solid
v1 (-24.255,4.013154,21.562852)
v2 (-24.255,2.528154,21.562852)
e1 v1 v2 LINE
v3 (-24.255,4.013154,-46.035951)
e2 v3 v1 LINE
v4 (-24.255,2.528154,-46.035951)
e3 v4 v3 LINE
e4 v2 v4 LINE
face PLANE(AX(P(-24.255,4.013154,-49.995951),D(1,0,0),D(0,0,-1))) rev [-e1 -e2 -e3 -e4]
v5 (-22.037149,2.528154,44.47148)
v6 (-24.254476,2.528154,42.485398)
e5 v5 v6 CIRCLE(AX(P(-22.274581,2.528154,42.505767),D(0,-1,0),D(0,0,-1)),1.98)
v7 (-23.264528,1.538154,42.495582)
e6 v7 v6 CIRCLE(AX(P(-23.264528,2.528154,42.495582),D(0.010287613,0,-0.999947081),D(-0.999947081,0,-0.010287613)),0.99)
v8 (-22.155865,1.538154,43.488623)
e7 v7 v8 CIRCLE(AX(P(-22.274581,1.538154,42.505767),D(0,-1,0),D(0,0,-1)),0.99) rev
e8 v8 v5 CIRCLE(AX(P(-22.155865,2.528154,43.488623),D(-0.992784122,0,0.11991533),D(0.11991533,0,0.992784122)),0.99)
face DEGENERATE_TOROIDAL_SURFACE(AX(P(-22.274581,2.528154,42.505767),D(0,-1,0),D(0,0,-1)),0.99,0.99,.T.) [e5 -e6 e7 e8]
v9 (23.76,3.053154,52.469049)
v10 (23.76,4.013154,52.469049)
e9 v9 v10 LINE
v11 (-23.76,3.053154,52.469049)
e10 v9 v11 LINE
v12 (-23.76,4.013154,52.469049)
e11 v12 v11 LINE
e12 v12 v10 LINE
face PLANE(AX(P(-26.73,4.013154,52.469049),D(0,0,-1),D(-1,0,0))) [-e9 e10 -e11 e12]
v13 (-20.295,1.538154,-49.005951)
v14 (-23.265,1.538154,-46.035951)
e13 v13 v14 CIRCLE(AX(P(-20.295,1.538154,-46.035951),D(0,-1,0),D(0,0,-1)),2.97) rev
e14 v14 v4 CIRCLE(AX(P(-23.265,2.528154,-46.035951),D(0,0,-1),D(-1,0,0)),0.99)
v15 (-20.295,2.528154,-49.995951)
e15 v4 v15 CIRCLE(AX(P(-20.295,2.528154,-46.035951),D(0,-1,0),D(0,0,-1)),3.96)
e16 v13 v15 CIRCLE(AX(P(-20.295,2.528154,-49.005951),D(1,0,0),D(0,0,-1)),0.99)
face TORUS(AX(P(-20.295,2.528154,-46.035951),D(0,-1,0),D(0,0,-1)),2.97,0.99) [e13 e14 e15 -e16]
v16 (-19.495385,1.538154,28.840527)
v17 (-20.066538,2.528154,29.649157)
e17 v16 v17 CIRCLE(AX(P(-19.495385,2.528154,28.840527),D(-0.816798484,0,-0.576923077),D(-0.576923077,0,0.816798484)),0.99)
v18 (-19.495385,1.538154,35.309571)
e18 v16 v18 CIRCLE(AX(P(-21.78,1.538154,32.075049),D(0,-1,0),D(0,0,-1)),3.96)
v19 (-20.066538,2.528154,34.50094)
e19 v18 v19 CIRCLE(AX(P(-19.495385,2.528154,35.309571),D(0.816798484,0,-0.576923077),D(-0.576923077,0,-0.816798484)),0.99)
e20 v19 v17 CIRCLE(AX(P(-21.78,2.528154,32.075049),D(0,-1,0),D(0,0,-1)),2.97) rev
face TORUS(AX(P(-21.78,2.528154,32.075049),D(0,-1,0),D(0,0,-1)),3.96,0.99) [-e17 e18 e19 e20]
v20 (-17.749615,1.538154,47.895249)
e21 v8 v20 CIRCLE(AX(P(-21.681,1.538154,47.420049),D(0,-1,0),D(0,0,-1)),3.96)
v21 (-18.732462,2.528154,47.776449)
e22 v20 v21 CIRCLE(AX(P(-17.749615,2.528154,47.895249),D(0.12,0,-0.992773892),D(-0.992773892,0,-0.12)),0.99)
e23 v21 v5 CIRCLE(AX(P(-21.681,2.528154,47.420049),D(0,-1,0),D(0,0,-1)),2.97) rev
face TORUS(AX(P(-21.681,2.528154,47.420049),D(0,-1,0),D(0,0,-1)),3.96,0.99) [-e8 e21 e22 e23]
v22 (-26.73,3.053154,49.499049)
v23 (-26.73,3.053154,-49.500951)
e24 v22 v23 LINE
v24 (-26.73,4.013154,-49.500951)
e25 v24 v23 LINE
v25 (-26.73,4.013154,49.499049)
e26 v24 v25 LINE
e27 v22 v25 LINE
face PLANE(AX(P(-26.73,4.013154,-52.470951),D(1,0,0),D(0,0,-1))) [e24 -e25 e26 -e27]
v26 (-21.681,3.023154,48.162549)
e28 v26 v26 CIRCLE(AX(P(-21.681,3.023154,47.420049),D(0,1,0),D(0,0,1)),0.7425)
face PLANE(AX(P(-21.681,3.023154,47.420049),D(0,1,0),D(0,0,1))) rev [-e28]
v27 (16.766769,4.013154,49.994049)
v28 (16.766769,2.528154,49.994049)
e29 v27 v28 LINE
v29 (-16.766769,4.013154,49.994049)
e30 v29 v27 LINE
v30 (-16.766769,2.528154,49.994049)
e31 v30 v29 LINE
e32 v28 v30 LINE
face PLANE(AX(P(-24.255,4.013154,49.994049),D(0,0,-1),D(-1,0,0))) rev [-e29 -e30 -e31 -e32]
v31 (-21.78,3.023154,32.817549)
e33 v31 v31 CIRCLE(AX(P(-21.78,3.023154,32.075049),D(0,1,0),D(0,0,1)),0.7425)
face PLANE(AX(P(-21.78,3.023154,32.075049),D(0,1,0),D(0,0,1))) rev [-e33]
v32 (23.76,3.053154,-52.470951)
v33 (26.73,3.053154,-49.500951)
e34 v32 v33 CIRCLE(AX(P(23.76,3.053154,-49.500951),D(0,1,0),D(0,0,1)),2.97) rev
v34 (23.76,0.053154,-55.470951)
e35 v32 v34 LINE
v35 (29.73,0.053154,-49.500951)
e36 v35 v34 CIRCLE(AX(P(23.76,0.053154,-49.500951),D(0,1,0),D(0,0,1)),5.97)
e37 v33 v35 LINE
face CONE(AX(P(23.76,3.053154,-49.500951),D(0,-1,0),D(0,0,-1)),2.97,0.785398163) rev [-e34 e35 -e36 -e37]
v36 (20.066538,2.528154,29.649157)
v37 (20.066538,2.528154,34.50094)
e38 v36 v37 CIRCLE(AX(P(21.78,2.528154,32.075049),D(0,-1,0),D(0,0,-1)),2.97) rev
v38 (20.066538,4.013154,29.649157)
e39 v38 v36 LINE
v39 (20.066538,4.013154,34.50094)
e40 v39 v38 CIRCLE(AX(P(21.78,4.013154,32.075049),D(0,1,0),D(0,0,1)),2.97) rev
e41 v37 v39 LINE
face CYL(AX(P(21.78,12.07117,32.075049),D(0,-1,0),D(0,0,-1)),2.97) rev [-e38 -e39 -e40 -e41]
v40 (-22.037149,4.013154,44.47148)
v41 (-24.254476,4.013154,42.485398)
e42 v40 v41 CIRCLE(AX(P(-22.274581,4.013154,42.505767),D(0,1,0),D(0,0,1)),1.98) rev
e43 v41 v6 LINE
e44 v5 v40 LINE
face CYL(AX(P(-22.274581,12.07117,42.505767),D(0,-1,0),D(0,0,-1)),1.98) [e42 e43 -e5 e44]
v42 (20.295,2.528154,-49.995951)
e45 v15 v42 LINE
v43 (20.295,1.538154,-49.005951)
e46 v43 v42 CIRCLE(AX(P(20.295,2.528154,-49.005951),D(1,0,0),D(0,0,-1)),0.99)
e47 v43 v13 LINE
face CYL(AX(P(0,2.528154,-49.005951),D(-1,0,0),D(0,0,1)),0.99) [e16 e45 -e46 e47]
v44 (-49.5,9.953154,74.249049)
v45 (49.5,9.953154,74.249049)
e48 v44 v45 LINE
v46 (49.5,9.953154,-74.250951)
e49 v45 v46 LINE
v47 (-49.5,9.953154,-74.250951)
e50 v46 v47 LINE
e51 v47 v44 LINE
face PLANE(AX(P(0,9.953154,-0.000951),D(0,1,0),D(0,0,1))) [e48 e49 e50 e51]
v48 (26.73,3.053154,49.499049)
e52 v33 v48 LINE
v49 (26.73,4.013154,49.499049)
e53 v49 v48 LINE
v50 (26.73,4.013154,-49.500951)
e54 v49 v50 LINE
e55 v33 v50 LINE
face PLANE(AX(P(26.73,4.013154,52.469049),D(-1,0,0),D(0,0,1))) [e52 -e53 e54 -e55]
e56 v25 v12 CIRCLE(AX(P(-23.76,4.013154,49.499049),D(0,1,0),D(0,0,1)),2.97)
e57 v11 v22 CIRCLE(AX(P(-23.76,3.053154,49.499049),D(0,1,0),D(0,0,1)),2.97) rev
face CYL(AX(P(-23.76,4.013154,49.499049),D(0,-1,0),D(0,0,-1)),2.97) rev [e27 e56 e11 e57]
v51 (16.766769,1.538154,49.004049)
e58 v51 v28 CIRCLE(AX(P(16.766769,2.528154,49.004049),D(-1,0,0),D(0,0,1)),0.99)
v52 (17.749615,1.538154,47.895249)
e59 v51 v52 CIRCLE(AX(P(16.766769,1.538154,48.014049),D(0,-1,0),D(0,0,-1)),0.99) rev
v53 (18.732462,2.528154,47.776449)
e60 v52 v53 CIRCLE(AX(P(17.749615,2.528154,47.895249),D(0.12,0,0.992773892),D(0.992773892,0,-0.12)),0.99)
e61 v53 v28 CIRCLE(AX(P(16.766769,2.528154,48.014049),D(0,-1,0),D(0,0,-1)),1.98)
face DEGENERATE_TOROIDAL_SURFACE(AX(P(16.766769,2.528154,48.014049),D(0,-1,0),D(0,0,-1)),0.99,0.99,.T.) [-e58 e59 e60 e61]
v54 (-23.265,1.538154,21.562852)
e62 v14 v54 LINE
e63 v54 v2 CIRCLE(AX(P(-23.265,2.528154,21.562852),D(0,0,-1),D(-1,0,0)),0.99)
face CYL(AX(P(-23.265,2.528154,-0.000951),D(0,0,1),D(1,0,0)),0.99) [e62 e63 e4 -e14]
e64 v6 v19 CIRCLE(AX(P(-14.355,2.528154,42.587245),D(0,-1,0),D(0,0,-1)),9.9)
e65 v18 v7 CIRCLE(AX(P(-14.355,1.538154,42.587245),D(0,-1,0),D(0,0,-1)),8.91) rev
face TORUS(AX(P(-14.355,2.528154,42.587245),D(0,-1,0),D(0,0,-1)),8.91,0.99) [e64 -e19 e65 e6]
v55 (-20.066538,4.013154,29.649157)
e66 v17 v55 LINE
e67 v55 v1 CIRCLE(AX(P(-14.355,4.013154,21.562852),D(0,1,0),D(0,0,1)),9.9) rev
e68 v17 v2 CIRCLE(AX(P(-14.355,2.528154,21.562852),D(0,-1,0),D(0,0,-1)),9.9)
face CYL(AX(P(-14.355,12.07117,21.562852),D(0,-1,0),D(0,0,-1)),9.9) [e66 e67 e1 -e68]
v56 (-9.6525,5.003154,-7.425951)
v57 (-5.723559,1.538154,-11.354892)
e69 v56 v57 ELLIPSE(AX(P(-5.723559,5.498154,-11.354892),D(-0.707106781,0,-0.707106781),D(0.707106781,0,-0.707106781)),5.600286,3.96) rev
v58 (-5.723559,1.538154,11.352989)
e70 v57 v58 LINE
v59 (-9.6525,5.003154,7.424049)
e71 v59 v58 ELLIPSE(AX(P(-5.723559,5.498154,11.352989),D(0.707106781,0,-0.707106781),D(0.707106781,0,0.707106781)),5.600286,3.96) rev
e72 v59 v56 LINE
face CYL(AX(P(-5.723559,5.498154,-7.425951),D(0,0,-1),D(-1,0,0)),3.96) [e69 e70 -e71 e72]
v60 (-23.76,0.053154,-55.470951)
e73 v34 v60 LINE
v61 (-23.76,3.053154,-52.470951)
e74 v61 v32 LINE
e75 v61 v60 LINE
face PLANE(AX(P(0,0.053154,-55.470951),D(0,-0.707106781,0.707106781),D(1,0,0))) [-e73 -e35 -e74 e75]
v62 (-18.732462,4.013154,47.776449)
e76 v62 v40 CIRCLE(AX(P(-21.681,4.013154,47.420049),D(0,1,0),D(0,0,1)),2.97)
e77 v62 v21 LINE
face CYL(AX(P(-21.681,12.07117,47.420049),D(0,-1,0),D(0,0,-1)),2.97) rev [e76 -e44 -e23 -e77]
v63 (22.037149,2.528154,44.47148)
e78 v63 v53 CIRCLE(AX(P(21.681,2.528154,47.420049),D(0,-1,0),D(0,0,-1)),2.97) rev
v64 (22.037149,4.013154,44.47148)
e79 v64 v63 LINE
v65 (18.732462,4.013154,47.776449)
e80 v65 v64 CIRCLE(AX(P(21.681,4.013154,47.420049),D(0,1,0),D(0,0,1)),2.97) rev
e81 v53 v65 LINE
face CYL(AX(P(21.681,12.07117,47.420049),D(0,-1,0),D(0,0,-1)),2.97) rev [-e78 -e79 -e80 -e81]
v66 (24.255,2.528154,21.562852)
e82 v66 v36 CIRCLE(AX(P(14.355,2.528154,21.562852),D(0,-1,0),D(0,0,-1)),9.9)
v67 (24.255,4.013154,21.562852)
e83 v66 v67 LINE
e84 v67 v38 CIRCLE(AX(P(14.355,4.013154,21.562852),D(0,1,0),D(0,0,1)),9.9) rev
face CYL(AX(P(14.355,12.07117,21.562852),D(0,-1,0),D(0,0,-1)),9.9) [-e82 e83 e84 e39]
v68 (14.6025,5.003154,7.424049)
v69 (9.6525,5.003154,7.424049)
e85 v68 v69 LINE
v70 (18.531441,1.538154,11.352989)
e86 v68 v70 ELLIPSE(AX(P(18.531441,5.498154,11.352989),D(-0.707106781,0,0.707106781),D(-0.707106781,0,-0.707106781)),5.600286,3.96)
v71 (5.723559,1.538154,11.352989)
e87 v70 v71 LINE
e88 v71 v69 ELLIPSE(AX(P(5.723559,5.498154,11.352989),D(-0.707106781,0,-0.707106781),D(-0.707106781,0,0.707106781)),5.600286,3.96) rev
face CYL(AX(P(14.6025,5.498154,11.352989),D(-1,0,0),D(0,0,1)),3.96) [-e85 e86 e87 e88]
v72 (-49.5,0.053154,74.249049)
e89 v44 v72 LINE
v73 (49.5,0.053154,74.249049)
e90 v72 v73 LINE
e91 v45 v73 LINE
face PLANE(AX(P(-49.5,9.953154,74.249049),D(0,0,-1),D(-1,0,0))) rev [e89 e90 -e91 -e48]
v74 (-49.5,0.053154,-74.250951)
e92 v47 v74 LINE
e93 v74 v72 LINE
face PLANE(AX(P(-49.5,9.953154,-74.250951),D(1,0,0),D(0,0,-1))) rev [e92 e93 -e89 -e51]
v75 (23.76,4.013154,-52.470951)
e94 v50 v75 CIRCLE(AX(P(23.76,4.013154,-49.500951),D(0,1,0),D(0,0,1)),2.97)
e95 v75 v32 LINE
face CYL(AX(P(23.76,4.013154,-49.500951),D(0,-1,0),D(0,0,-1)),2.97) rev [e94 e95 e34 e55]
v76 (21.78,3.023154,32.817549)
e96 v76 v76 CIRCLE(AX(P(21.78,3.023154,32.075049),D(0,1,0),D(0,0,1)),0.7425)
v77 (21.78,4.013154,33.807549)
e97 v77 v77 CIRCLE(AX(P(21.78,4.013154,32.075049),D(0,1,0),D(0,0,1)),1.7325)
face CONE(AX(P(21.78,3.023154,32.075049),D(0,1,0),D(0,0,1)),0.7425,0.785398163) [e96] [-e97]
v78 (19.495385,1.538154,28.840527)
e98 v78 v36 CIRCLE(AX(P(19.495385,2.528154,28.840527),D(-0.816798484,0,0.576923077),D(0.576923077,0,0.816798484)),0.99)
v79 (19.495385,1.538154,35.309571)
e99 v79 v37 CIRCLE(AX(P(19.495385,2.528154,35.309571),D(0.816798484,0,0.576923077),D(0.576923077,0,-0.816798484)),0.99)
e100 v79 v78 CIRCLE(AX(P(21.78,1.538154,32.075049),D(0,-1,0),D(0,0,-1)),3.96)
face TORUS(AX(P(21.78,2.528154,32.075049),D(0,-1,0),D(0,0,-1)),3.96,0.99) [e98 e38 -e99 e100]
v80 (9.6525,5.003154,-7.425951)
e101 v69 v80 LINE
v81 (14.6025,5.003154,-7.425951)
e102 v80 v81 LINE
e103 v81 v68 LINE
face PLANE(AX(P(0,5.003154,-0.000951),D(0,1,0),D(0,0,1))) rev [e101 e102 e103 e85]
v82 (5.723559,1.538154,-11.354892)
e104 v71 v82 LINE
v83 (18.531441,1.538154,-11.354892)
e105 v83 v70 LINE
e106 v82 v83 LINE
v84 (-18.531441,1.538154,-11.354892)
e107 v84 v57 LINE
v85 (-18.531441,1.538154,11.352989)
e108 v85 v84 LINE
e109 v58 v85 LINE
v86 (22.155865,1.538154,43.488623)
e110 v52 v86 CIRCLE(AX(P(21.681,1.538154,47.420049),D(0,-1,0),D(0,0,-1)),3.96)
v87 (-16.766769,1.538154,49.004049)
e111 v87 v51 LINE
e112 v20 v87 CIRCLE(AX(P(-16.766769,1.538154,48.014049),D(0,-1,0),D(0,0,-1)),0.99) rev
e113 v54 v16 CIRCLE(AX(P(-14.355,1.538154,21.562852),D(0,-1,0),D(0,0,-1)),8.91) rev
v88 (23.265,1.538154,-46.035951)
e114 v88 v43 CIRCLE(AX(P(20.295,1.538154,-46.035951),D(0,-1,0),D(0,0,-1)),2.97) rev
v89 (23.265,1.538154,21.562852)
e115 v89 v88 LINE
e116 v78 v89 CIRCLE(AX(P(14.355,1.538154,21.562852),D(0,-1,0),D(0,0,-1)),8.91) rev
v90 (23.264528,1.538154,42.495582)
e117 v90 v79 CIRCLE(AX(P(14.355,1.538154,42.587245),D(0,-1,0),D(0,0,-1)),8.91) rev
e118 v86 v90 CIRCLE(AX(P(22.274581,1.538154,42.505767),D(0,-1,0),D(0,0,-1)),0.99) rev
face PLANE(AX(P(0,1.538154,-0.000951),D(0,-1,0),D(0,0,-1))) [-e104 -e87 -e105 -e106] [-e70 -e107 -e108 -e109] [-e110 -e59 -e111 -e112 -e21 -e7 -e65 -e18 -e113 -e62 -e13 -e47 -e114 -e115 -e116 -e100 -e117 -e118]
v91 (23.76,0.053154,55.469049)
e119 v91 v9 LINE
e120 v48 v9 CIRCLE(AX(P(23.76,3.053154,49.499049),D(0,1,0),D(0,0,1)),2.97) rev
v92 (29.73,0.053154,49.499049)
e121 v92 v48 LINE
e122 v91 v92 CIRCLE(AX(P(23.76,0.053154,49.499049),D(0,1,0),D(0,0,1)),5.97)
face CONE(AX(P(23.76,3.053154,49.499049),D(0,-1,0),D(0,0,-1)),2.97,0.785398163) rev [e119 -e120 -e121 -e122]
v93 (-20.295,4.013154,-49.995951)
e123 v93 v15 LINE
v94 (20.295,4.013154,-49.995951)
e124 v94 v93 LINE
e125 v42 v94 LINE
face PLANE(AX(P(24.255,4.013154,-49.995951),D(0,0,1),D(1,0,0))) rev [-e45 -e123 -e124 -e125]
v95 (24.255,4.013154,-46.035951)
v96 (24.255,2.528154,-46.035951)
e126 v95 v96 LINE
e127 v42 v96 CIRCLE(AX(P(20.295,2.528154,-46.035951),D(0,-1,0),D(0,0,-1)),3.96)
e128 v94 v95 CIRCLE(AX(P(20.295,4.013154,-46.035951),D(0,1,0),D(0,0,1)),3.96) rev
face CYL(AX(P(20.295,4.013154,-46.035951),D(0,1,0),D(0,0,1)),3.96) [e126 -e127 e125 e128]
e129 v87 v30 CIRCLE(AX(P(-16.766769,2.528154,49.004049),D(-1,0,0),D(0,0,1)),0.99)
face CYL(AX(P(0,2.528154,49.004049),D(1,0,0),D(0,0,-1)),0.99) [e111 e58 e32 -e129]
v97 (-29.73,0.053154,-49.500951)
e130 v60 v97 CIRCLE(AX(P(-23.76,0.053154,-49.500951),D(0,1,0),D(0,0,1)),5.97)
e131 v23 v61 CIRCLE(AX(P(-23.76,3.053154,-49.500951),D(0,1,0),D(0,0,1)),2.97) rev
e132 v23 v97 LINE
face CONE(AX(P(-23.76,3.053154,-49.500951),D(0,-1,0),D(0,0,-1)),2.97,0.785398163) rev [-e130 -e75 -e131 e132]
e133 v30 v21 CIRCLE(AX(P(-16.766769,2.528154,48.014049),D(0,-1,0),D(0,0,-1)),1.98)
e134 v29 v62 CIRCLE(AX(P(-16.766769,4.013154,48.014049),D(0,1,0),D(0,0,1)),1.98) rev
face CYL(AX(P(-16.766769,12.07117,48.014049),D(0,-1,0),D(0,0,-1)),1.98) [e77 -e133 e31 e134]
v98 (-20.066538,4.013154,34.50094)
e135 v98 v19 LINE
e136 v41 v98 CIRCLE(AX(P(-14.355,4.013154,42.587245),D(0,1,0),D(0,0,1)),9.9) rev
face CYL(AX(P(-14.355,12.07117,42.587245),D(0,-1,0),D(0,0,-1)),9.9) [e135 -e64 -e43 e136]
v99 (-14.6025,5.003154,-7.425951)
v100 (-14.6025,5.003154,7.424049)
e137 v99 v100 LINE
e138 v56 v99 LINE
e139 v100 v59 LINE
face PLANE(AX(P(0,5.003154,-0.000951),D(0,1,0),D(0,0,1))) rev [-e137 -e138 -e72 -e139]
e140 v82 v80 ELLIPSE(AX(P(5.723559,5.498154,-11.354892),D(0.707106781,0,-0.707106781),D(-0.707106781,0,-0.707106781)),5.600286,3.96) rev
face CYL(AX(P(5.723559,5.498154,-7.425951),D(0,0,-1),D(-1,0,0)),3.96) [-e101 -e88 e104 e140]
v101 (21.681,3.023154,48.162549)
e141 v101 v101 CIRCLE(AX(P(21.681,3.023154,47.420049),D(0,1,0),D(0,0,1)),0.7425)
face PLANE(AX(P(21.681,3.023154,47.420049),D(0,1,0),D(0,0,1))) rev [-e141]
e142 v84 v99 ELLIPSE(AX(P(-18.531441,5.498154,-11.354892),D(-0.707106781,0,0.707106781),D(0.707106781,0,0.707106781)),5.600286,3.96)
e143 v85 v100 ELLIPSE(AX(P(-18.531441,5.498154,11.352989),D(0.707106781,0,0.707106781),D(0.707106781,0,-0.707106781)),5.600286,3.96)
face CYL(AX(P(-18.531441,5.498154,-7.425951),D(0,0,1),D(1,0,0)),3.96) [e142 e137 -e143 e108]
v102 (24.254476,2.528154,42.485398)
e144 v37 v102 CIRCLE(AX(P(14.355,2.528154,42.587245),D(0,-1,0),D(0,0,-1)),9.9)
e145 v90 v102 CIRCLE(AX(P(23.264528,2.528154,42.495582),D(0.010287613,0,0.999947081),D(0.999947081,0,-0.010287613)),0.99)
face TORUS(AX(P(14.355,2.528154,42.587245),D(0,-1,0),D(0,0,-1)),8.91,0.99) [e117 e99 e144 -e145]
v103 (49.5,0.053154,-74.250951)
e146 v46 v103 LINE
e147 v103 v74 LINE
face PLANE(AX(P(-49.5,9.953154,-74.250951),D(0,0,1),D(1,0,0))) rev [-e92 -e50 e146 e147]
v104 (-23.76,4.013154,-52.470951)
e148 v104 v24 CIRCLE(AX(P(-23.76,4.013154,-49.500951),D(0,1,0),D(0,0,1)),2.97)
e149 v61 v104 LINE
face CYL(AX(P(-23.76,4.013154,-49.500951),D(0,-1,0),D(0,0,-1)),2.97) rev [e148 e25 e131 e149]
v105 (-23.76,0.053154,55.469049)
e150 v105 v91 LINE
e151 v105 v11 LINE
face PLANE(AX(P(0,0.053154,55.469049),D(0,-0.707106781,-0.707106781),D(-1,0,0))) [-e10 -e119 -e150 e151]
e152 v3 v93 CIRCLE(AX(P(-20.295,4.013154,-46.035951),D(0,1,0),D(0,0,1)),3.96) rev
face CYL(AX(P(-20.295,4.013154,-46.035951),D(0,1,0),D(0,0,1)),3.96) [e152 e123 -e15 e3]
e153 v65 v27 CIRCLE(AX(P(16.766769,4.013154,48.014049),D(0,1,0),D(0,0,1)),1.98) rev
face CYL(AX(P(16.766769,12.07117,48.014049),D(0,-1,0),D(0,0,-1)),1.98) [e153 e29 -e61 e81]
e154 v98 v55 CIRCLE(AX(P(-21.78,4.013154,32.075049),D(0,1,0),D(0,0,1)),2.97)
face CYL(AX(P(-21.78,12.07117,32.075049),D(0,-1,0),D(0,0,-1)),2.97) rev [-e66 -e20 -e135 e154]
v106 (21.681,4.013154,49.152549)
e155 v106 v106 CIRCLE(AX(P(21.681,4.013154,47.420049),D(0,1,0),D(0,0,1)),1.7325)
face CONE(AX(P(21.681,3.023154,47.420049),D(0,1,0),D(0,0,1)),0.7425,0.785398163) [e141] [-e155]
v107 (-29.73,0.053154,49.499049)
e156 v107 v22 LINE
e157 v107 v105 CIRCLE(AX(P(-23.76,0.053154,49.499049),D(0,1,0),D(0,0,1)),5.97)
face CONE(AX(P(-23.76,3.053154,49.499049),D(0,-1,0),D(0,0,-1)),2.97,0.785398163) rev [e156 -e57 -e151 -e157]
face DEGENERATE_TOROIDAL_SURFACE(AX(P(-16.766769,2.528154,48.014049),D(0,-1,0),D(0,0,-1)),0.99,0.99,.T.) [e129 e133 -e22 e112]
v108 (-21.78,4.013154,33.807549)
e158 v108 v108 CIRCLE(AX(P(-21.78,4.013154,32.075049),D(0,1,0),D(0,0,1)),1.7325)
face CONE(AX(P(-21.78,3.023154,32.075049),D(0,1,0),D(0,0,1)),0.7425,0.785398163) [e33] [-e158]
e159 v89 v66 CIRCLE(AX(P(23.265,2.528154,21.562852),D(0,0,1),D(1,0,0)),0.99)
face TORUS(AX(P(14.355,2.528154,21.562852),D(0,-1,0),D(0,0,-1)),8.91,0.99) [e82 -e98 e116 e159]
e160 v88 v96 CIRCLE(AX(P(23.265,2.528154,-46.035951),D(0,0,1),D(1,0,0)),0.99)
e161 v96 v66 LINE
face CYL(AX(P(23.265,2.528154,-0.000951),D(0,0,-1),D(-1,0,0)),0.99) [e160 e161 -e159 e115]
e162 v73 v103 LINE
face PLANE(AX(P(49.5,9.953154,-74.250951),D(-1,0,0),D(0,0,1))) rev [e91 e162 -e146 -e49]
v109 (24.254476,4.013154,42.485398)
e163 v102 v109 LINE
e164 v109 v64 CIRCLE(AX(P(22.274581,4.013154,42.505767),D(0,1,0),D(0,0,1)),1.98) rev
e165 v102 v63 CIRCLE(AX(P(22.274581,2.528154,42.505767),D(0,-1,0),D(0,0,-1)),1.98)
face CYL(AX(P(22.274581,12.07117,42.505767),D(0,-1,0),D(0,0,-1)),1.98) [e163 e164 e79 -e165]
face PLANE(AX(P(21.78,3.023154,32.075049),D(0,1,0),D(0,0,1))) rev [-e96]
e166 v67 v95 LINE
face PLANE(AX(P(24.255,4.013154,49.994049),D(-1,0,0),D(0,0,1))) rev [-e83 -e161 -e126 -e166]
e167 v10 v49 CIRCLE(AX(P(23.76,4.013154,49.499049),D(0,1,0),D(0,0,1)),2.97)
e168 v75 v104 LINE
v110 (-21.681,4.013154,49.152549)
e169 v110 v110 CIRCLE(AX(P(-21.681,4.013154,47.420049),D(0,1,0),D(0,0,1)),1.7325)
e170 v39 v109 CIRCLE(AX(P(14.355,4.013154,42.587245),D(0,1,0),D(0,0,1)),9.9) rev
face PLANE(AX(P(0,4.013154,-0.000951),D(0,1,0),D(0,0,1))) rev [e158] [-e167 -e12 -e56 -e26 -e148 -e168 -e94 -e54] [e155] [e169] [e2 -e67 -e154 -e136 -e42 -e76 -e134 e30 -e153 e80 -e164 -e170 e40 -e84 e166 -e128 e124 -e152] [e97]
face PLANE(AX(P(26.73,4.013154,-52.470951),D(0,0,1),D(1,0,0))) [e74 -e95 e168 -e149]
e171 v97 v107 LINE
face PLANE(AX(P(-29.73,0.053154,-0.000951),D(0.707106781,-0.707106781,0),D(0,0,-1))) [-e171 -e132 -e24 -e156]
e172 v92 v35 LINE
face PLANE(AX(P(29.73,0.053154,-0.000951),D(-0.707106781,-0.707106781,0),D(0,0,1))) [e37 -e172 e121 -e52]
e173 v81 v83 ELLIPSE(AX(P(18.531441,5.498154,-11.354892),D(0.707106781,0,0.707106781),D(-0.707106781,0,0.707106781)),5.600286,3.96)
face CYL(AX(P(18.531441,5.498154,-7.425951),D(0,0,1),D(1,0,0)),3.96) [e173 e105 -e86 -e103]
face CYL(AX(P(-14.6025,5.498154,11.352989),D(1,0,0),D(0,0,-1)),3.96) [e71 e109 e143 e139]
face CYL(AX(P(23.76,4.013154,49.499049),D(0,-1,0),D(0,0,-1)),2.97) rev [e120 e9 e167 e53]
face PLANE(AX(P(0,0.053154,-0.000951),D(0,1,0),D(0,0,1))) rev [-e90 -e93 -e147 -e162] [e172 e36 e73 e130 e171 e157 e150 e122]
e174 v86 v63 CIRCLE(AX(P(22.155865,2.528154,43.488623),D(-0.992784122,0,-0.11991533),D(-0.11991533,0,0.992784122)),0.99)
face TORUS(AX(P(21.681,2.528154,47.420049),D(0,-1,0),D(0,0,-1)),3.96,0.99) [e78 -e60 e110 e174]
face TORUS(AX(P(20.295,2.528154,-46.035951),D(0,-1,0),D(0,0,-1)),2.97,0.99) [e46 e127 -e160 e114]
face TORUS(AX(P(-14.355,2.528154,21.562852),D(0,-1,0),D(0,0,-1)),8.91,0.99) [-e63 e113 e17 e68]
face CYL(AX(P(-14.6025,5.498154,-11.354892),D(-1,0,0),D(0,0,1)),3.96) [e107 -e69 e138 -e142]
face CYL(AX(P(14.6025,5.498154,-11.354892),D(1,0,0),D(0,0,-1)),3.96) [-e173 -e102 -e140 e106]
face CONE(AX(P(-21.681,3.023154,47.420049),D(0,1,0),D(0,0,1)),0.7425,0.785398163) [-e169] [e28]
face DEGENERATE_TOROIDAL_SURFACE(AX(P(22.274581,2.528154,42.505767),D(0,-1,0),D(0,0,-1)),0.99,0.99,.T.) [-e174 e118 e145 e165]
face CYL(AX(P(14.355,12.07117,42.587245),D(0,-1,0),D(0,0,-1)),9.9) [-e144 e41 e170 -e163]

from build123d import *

# Parameters (mm, degrees)
SKETCH1_W            = 49
SKETCH1_H            = 101
BOSS_EXTRUDE1_DEPTH  = 1.5
SKETCH2_W            = 54
SKETCH2_H            = 106
SKETCH2_W_2          = 49
SKETCH2_H_2          = 101
BOSS_EXTRUDE2_DEPTH  = 4
BOSS_EXTRUDE3_DEPTH  = 4
SKETCH8_W            = 5
SKETCH8_H            = 15
BOSS_EXTRUDE4_DEPTH  = 3.5
FILLET3_R            = 4
FILLET3_OF_MIRROR1_R = 4
SKETCH4_R            = 1.75
CUT_EXTRUDE1_DEPTH   = 1
SKETCH5_R            = 1.75
CUT_EXTRUDE2_DEPTH   = 1
FILLET1_R            = 3
FILLET2_R            = 10
CHAMFER1_SIZE        = 1
CHAMFER2_SIZE        = 1
FILLET4_R            = 2
FILLET6_R            = 4
FILLET5_R            = 1
SKETCH9_W            = 100
SKETCH9_H            = 150
BOSS_EXTRUDE5_DEPTH  = 10
SCALE1_SCALE         = 0.99
CHAMFER3_SIZE        = 3


# Some blends are built 0.0001 mm under size
with BuildPart() as part:
    # Sketch1 → Boss-Extrude1 (new body)
    with BuildSketch(Plane(origin=(0, 0, 0), x_dir=(1, 0, 0), z_dir=(0, 1, 0))):
        Rectangle(SKETCH1_W, SKETCH1_H)
    extrude(amount=BOSS_EXTRUDE1_DEPTH)

    # Sketch2 → Boss-Extrude2 (add)
    with BuildSketch(Plane(origin=(0, 0, 0), x_dir=(1, 0, 0), z_dir=(0, 1, 0))):
        Rectangle(SKETCH2_W, SKETCH2_H)
        Rectangle(SKETCH2_W_2, SKETCH2_H_2, mode=Mode.SUBTRACT)
    extrude(amount=BOSS_EXTRUDE2_DEPTH)

    # Sketch3 → Boss-Extrude3 (add)
    with BuildSketch(Plane(origin=(0, 0, 0), x_dir=(1, 0, 0), z_dir=(0, 1, 0))):
        with BuildLine():
            Line((-24.5, -30.741687605), (-24.5, -34.058312395))
            ThreePointArc((-24.5, -34.058312395), (-19, -32.4), (-24.5, -30.741687605))
        make_face()
        with BuildLine():
            Line((-24.5, -46.403337045), (-24.5, -50.5))
            Line((-24.5, -50.5), (-20.403337045, -50.5))
            ThreePointArc((-20.403337045, -50.5), (-19.778679656, -45.778679656), (-24.5, -46.403337045))
        make_face()
    boss_extrude3 = extrude(amount=BOSS_EXTRUDE3_DEPTH)

    # Sketch8 → Boss-Extrude4 (add)
    with BuildSketch(Plane(origin=(0, 1.5, 0), x_dir=(1, 0, 0), z_dir=(0, 1, 0))):
        with Locations((-12.25, 0)):
            Rectangle(SKETCH8_W, SKETCH8_H)
    boss_extrude4 = extrude(amount=BOSS_EXTRUDE4_DEPTH)

    # Fillet3
    # the kernel refuses this fillet: 4 mm, written as the material it adds along each edge
    with BuildSketch(Plane(origin=(-14.75, 1.5, -7.5), x_dir=(0, 0, -1), z_dir=(1, 0, 0)), Plane(origin=(-9.75, 1.5, 7.5), x_dir=(0, 0, 1), z_dir=(-1, 0, 0))) as fillet3_piece_1:
        with BuildLine():
            CenterArc((3.968626967, 4), FILLET3_R, 187.180755781, 82.819244219)
            Line((0, 3.5), (-0.079372539, 3.49))
            ThreePointArc((-0.079372539, 3.49), (-0.08, 1.75), (-0.08, 0))
            Line((-0.08, 0), (0, -0.08))
            Line((0, -0.08), (3.968626967, -0.08))
            Line((3.968626967, -0.08), (3.968626967, 0))
        make_face()
    extrude(amount=5)
    with BuildSketch(Plane(origin=(-9.75, 1.5, -7.5), x_dir=(1, 0, 0), z_dir=(0, 0, 1)), Plane(origin=(-14.75, 1.5, 7.5), x_dir=(-1, 0, 0), z_dir=(0, 0, -1))) as fillet3_piece_2:
        with BuildLine():
            CenterArc((3.968626967, 4), FILLET3_R, 187.180755781, 82.819244219)
            Line((0, 3.5), (-0.079372539, 3.49))
            ThreePointArc((-0.079372539, 3.49), (-0.08, 1.75), (-0.08, 0))
            Line((-0.08, 0), (0, -0.08))
            Line((0, -0.08), (3.968626967, -0.08))
            Line((3.968626967, -0.08), (3.968626967, 0))
        make_face()
    extrude(amount=15)
    with BuildSketch(Plane(origin=(-14.75, 1.5, 7.5), x_dir=(-1, 0, 0), z_dir=(0, 0, -1))) as fillet3_piece_3a_section:
        with BuildLine():
            CenterArc((3.968626967, 4), FILLET3_R, 187.180755781, 82.819244219)
            Line((0, 3.5), (-0.079372539, 3.49))
            ThreePointArc((-0.079372539, 3.49), (-0.08, 1.75), (-0.08, 0))
            Line((-0.08, 0), (0, -0.08))
            Line((0, -0.08), (3.968626967, -0.08))
            Line((3.968626967, -0.08), (3.968626967, 0))
        make_face()
    fillet3_piece_3a = extrude(amount=24.921567416, mode=Mode.PRIVATE)
    fillet3_piece_3a = split(fillet3_piece_3a, bisect_by=Plane(origin=(-15.663794772, 2.350141375, -7.5), z_dir=(0, 0, -1)), keep=Keep.TOP, mode=Mode.PRIVATE)
    with BuildSketch(Plane(origin=(-24.671567416, 1.5, -7.5), x_dir=(0, 0, -1), z_dir=(1, 0, 0))) as fillet3_piece_3b_section:
        with BuildLine():
            CenterArc((3.968626967, 4), FILLET3_R, 187.180755781, 82.819244219)
            Line((0, 3.5), (-0.079372539, 3.49))
            ThreePointArc((-0.079372539, 3.49), (-0.08, 1.75), (-0.08, 0))
            Line((-0.08, 0), (0, -0.08))
            Line((0, -0.08), (3.968626967, -0.08))
            Line((3.968626967, -0.08), (3.968626967, 0))
        make_face()
    fillet3_piece_3b = extrude(amount=14.921567416, mode=Mode.PRIVATE)
    fillet3_piece_3b = split(fillet3_piece_3b, bisect_by=Plane(origin=(-14.75, 2.350141375, -8.413794772), z_dir=(-1, 0, 0)), keep=Keep.TOP, mode=Mode.PRIVATE)
    fillet3_piece_3 = fillet3_piece_3a & fillet3_piece_3b
    add(fillet3_piece_3)
    with BuildSketch(Plane(origin=(-9.75, 1.5, -17.421567416), x_dir=(1, 0, 0), z_dir=(0, 0, 1))) as fillet3_piece_4a_section:
        with BuildLine():
            CenterArc((3.968626967, 4), FILLET3_R, 187.180755781, 82.819244219)
            Line((0, 3.5), (-0.079372539, 3.49))
            ThreePointArc((-0.079372539, 3.49), (-0.08, 1.75), (-0.08, 0))
            Line((-0.08, 0), (0, -0.08))
            Line((0, -0.08), (3.968626967, -0.08))
            Line((3.968626967, -0.08), (3.968626967, 0))
        make_face()
    fillet3_piece_4a = extrude(amount=24.921567416, mode=Mode.PRIVATE)
    fillet3_piece_4a = split(fillet3_piece_4a, bisect_by=Plane(origin=(-8.836205228, 2.350141375, -7.5), z_dir=(0, 0, -1)), keep=Keep.TOP, mode=Mode.PRIVATE)
    with BuildSketch(Plane(origin=(-14.75, 1.5, -7.5), x_dir=(0, 0, -1), z_dir=(1, 0, 0))) as fillet3_piece_4b_section:
        with BuildLine():
            CenterArc((3.968626967, 4), FILLET3_R, 187.180755781, 82.819244219)
            Line((0, 3.5), (-0.079372539, 3.49))
            ThreePointArc((-0.079372539, 3.49), (-0.08, 1.75), (-0.08, 0))
            Line((-0.08, 0), (0, -0.08))
            Line((0, -0.08), (3.968626967, -0.08))
            Line((3.968626967, -0.08), (3.968626967, 0))
        make_face()
    fillet3_piece_4b = extrude(amount=14.921567416, mode=Mode.PRIVATE)
    fillet3_piece_4b = split(fillet3_piece_4b, bisect_by=Plane(origin=(-9.75, 2.350141375, -8.413794772), z_dir=(1, 0, 0)), keep=Keep.TOP, mode=Mode.PRIVATE)
    fillet3_piece_4 = fillet3_piece_4a & fillet3_piece_4b
    add(fillet3_piece_4)
    with BuildSketch(Plane(origin=(0.171567416, 1.5, 7.5), x_dir=(0, 0, 1), z_dir=(-1, 0, 0))) as fillet3_piece_5a_section:
        with BuildLine():
            CenterArc((3.968626967, 4), FILLET3_R, 187.180755781, 82.819244219)
            Line((0, 3.5), (-0.079372539, 3.49))
            ThreePointArc((-0.079372539, 3.49), (-0.08, 1.75), (-0.08, 0))
            Line((-0.08, 0), (0, -0.08))
            Line((0, -0.08), (3.968626967, -0.08))
            Line((3.968626967, -0.08), (3.968626967, 0))
        make_face()
    fillet3_piece_5a = extrude(amount=14.921567416, mode=Mode.PRIVATE)
    fillet3_piece_5a = split(fillet3_piece_5a, bisect_by=Plane(origin=(-9.75, 2.350141375, 8.413794772), z_dir=(1, 0, 0)), keep=Keep.TOP, mode=Mode.PRIVATE)
    with BuildSketch(Plane(origin=(-9.75, 1.5, -7.5), x_dir=(1, 0, 0), z_dir=(0, 0, 1))) as fillet3_piece_5b_section:
        with BuildLine():
            CenterArc((3.968626967, 4), FILLET3_R, 187.180755781, 82.819244219)
            Line((0, 3.5), (-0.079372539, 3.49))
            ThreePointArc((-0.079372539, 3.49), (-0.08, 1.75), (-0.08, 0))
            Line((-0.08, 0), (0, -0.08))
            Line((0, -0.08), (3.968626967, -0.08))
            Line((3.968626967, -0.08), (3.968626967, 0))
        make_face()
    fillet3_piece_5b = extrude(amount=24.921567416, mode=Mode.PRIVATE)
    fillet3_piece_5b = split(fillet3_piece_5b, bisect_by=Plane(origin=(-8.836205228, 2.350141375, 7.5), z_dir=(0, 0, 1)), keep=Keep.TOP, mode=Mode.PRIVATE)
    fillet3_piece_5 = fillet3_piece_5a & fillet3_piece_5b
    add(fillet3_piece_5)
    with BuildSketch(Plane(origin=(-14.75, 1.5, 17.421567416), x_dir=(-1, 0, 0), z_dir=(0, 0, -1))) as fillet3_piece_6a_section:
        with BuildLine():
            CenterArc((3.968626967, 4), FILLET3_R, 187.180755781, 82.819244219)
            Line((0, 3.5), (-0.079372539, 3.49))
            ThreePointArc((-0.079372539, 3.49), (-0.08, 1.75), (-0.08, 0))
            Line((-0.08, 0), (0, -0.08))
            Line((0, -0.08), (3.968626967, -0.08))
            Line((3.968626967, -0.08), (3.968626967, 0))
        make_face()
    fillet3_piece_6a = extrude(amount=24.921567416, mode=Mode.PRIVATE)
    fillet3_piece_6a = split(fillet3_piece_6a, bisect_by=Plane(origin=(-15.663794772, 2.350141375, 7.5), z_dir=(0, 0, 1)), keep=Keep.TOP, mode=Mode.PRIVATE)
    with BuildSketch(Plane(origin=(-9.75, 1.5, 7.5), x_dir=(0, 0, 1), z_dir=(-1, 0, 0))) as fillet3_piece_6b_section:
        with BuildLine():
            CenterArc((3.968626967, 4), FILLET3_R, 187.180755781, 82.819244219)
            Line((0, 3.5), (-0.079372539, 3.49))
            ThreePointArc((-0.079372539, 3.49), (-0.08, 1.75), (-0.08, 0))
            Line((-0.08, 0), (0, -0.08))
            Line((0, -0.08), (3.968626967, -0.08))
            Line((3.968626967, -0.08), (3.968626967, 0))
        make_face()
    fillet3_piece_6b = extrude(amount=14.921567416, mode=Mode.PRIVATE)
    fillet3_piece_6b = split(fillet3_piece_6b, bisect_by=Plane(origin=(-14.75, 2.350141375, 8.413794772), z_dir=(-1, 0, 0)), keep=Keep.TOP, mode=Mode.PRIVATE)
    fillet3_piece_6 = fillet3_piece_6a & fillet3_piece_6b
    add(fillet3_piece_6)

    # Mirror1: Boss-Extrude3, Boss-Extrude4 across plane
    add(boss_extrude3.mirror(Plane(origin=(0, 0, 0), x_dir=(0, 0, 1), z_dir=(1, 0, 0))))
    add(boss_extrude4.mirror(Plane(origin=(0, 0, 0), x_dir=(0, 0, 1), z_dir=(1, 0, 0))))

    # Fillet3 of Mirror1
    # the kernel refuses this fillet: 4 mm, written as the material it adds along each edge
    with BuildSketch(Plane(origin=(14.75, 1.5, -7.5), x_dir=(0, 0, -1), z_dir=(-1, 0, 0)), Plane(origin=(9.75, 1.5, 7.5), x_dir=(0, 0, 1), z_dir=(1, 0, 0))) as fillet3_of_mirror1_piece_1:
        with BuildLine():
            CenterArc((3.968626967, -4), FILLET3_OF_MIRROR1_R, 90, 82.819244219)
            Line((0, -3.5), (-0.079372539, -3.49))
            ThreePointArc((-0.079372539, -3.49), (-0.08, -1.75), (-0.08, 0))
            Line((-0.08, 0), (0, 0.08))
            Line((0, 0.08), (3.968626967, 0.08))
            Line((3.968626967, 0.08), (3.968626967, 0))
        make_face()
    extrude(amount=5)
    with BuildSketch(Plane(origin=(9.75, 1.5, -7.5), x_dir=(-1, 0, 0), z_dir=(0, 0, 1)), Plane(origin=(14.75, 1.5, 7.5), x_dir=(1, 0, 0), z_dir=(0, 0, -1))) as fillet3_of_mirror1_piece_2:
        with BuildLine():
            CenterArc((3.968626967, -4), FILLET3_OF_MIRROR1_R, 90, 82.819244219)
            Line((0, -3.5), (-0.079372539, -3.49))
            ThreePointArc((-0.079372539, -3.49), (-0.08, -1.75), (-0.08, 0))
            Line((-0.08, 0), (0, 0.08))
            Line((0, 0.08), (3.968626967, 0.08))
            Line((3.968626967, 0.08), (3.968626967, 0))
        make_face()
    extrude(amount=15)
    with BuildSketch(Plane(origin=(24.671567416, 1.5, -7.5), x_dir=(0, 0, -1), z_dir=(-1, 0, 0))) as fillet3_of_mirror1_piece_3a_section:
        with BuildLine():
            CenterArc((3.968626967, -4), FILLET3_OF_MIRROR1_R, 90, 82.819244219)
            Line((0, -3.5), (-0.079372539, -3.49))
            ThreePointArc((-0.079372539, -3.49), (-0.08, -1.75), (-0.08, 0))
            Line((-0.08, 0), (0, 0.08))
            Line((0, 0.08), (3.968626967, 0.08))
            Line((3.968626967, 0.08), (3.968626967, 0))
        make_face()
    fillet3_of_mirror1_piece_3a = extrude(amount=14.921567416, mode=Mode.PRIVATE)
    fillet3_of_mirror1_piece_3a = split(fillet3_of_mirror1_piece_3a, bisect_by=Plane(origin=(14.75, 2.350141375, -8.413794772), z_dir=(1, 0, 0)), keep=Keep.TOP, mode=Mode.PRIVATE)
    with BuildSketch(Plane(origin=(14.75, 1.5, 7.5), x_dir=(1, 0, 0), z_dir=(0, 0, -1))) as fillet3_of_mirror1_piece_3b_section:
        with BuildLine():
            CenterArc((3.968626967, -4), FILLET3_OF_MIRROR1_R, 90, 82.819244219)
            Line((0, -3.5), (-0.079372539, -3.49))
            ThreePointArc((-0.079372539, -3.49), (-0.08, -1.75), (-0.08, 0))
            Line((-0.08, 0), (0, 0.08))
            Line((0, 0.08), (3.968626967, 0.08))
            Line((3.968626967, 0.08), (3.968626967, 0))
        make_face()
    fillet3_of_mirror1_piece_3b = extrude(amount=24.921567416, mode=Mode.PRIVATE)
    fillet3_of_mirror1_piece_3b = split(fillet3_of_mirror1_piece_3b, bisect_by=Plane(origin=(15.663794772, 2.350141375, -7.5), z_dir=(0, 0, -1)), keep=Keep.TOP, mode=Mode.PRIVATE)
    fillet3_of_mirror1_piece_3 = fillet3_of_mirror1_piece_3a & fillet3_of_mirror1_piece_3b
    add(fillet3_of_mirror1_piece_3)
    with BuildSketch(Plane(origin=(14.75, 1.5, -7.5), x_dir=(0, 0, -1), z_dir=(-1, 0, 0))) as fillet3_of_mirror1_piece_4a_section:
        with BuildLine():
            CenterArc((3.968626967, -4), FILLET3_OF_MIRROR1_R, 90, 82.819244219)
            Line((0, -3.5), (-0.079372539, -3.49))
            ThreePointArc((-0.079372539, -3.49), (-0.08, -1.75), (-0.08, 0))
            Line((-0.08, 0), (0, 0.08))
            Line((0, 0.08), (3.968626967, 0.08))
            Line((3.968626967, 0.08), (3.968626967, 0))
        make_face()
    fillet3_of_mirror1_piece_4a = extrude(amount=14.921567416, mode=Mode.PRIVATE)
    fillet3_of_mirror1_piece_4a = split(fillet3_of_mirror1_piece_4a, bisect_by=Plane(origin=(9.75, 2.350141375, -8.413794772), z_dir=(-1, 0, 0)), keep=Keep.TOP, mode=Mode.PRIVATE)
    with BuildSketch(Plane(origin=(9.75, 1.5, -17.421567416), x_dir=(-1, 0, 0), z_dir=(0, 0, 1))) as fillet3_of_mirror1_piece_4b_section:
        with BuildLine():
            CenterArc((3.968626967, -4), FILLET3_OF_MIRROR1_R, 90, 82.819244219)
            Line((0, -3.5), (-0.079372539, -3.49))
            ThreePointArc((-0.079372539, -3.49), (-0.08, -1.75), (-0.08, 0))
            Line((-0.08, 0), (0, 0.08))
            Line((0, 0.08), (3.968626967, 0.08))
            Line((3.968626967, 0.08), (3.968626967, 0))
        make_face()
    fillet3_of_mirror1_piece_4b = extrude(amount=24.921567416, mode=Mode.PRIVATE)
    fillet3_of_mirror1_piece_4b = split(fillet3_of_mirror1_piece_4b, bisect_by=Plane(origin=(8.836205228, 2.350141375, -7.5), z_dir=(0, 0, -1)), keep=Keep.TOP, mode=Mode.PRIVATE)
    fillet3_of_mirror1_piece_4 = fillet3_of_mirror1_piece_4a & fillet3_of_mirror1_piece_4b
    add(fillet3_of_mirror1_piece_4)
    with BuildSketch(Plane(origin=(9.75, 1.5, -7.5), x_dir=(-1, 0, 0), z_dir=(0, 0, 1))) as fillet3_of_mirror1_piece_5a_section:
        with BuildLine():
            CenterArc((3.968626967, -4), FILLET3_OF_MIRROR1_R, 90, 82.819244219)
            Line((0, -3.5), (-0.079372539, -3.49))
            ThreePointArc((-0.079372539, -3.49), (-0.08, -1.75), (-0.08, 0))
            Line((-0.08, 0), (0, 0.08))
            Line((0, 0.08), (3.968626967, 0.08))
            Line((3.968626967, 0.08), (3.968626967, 0))
        make_face()
    fillet3_of_mirror1_piece_5a = extrude(amount=24.921567416, mode=Mode.PRIVATE)
    fillet3_of_mirror1_piece_5a = split(fillet3_of_mirror1_piece_5a, bisect_by=Plane(origin=(8.836205228, 2.350141375, 7.5), z_dir=(0, 0, 1)), keep=Keep.TOP, mode=Mode.PRIVATE)
    with BuildSketch(Plane(origin=(-0.171567416, 1.5, 7.5), x_dir=(0, 0, 1), z_dir=(1, 0, 0))) as fillet3_of_mirror1_piece_5b_section:
        with BuildLine():
            CenterArc((3.968626967, -4), FILLET3_OF_MIRROR1_R, 90, 82.819244219)
            Line((0, -3.5), (-0.079372539, -3.49))
            ThreePointArc((-0.079372539, -3.49), (-0.08, -1.75), (-0.08, 0))
            Line((-0.08, 0), (0, 0.08))
            Line((0, 0.08), (3.968626967, 0.08))
            Line((3.968626967, 0.08), (3.968626967, 0))
        make_face()
    fillet3_of_mirror1_piece_5b = extrude(amount=14.921567416, mode=Mode.PRIVATE)
    fillet3_of_mirror1_piece_5b = split(fillet3_of_mirror1_piece_5b, bisect_by=Plane(origin=(9.75, 2.350141375, 8.413794772), z_dir=(-1, 0, 0)), keep=Keep.TOP, mode=Mode.PRIVATE)
    fillet3_of_mirror1_piece_5 = fillet3_of_mirror1_piece_5a & fillet3_of_mirror1_piece_5b
    add(fillet3_of_mirror1_piece_5)
    with BuildSketch(Plane(origin=(9.75, 1.5, 7.5), x_dir=(0, 0, 1), z_dir=(1, 0, 0))) as fillet3_of_mirror1_piece_6a_section:
        with BuildLine():
            CenterArc((3.968626967, -4), FILLET3_OF_MIRROR1_R, 90, 82.819244219)
            Line((0, -3.5), (-0.079372539, -3.49))
            ThreePointArc((-0.079372539, -3.49), (-0.08, -1.75), (-0.08, 0))
            Line((-0.08, 0), (0, 0.08))
            Line((0, 0.08), (3.968626967, 0.08))
            Line((3.968626967, 0.08), (3.968626967, 0))
        make_face()
    fillet3_of_mirror1_piece_6a = extrude(amount=14.921567416, mode=Mode.PRIVATE)
    fillet3_of_mirror1_piece_6a = split(fillet3_of_mirror1_piece_6a, bisect_by=Plane(origin=(14.75, 2.350141375, 8.413794772), z_dir=(1, 0, 0)), keep=Keep.TOP, mode=Mode.PRIVATE)
    with BuildSketch(Plane(origin=(14.75, 1.5, 17.421567416), x_dir=(1, 0, 0), z_dir=(0, 0, -1))) as fillet3_of_mirror1_piece_6b_section:
        with BuildLine():
            CenterArc((3.968626967, -4), FILLET3_OF_MIRROR1_R, 90, 82.819244219)
            Line((0, -3.5), (-0.079372539, -3.49))
            ThreePointArc((-0.079372539, -3.49), (-0.08, -1.75), (-0.08, 0))
            Line((-0.08, 0), (0, 0.08))
            Line((0, 0.08), (3.968626967, 0.08))
            Line((3.968626967, 0.08), (3.968626967, 0))
        make_face()
    fillet3_of_mirror1_piece_6b = extrude(amount=24.921567416, mode=Mode.PRIVATE)
    fillet3_of_mirror1_piece_6b = split(fillet3_of_mirror1_piece_6b, bisect_by=Plane(origin=(15.663794772, 2.350141375, 7.5), z_dir=(0, 0, 1)), keep=Keep.TOP, mode=Mode.PRIVATE)
    fillet3_of_mirror1_piece_6 = fillet3_of_mirror1_piece_6a & fillet3_of_mirror1_piece_6b
    add(fillet3_of_mirror1_piece_6)

    # Sketch4 → Cut-Extrude1 (cut)
    with BuildSketch(Plane(origin=(0, 4, 0), x_dir=(1, 0, 0), z_dir=(0, 1, 0))):
        with Locations(Location((-21.9, -47.9, 0), (0, 0, 270))):
            Circle(SKETCH4_R)
        with Locations(Location((21.9, -47.9, 0), (0, 0, 270))):
            Circle(SKETCH4_R)
    extrude(amount=-CUT_EXTRUDE1_DEPTH, mode=Mode.SUBTRACT)

    # Sketch5 → Cut-Extrude2 (cut)
    with BuildSketch(Plane(origin=(0, 4, 0), x_dir=(1, 0, 0), z_dir=(0, 1, 0))):
        with Locations(Location((-22, -32.4, 0), (0, 0, 270))):
            Circle(SKETCH5_R)
        with Locations(Location((22, -32.4, 0), (0, 0, 270))):
            Circle(SKETCH5_R)
    extrude(amount=-CUT_EXTRUDE2_DEPTH, mode=Mode.SUBTRACT)

    # Fillet1
    fillet1_edges = [part.edges().sort_by_distance(p)[0] for p in [
        (-27, 2, 53),
        (27, 2, 53),
        (27, 2, -53),
        (-27, 2, -53),
    ]]
    fillet(fillet1_edges, radius=FILLET1_R)

    # Fillet2
    fillet2_edges = [part.edges().sort_by_distance(p)[0] for p in [
        (24.5, 2.75, 34.058312395),
        (24.5, 2.75, 30.741687605),
        (-24.5, 2.75, 34.058312395),
        (-24.5, 2.75, 30.741687605),
    ]]
    fillet(fillet2_edges, radius=FILLET2_R)

    # Chamfer1
    chamfer1_edges = [part.edges().sort_by_distance(p)[0] for p in [
        (-22, 3, 30.65),
        (22, 3, 30.65),
    ]]
    chamfer(chamfer1_edges, length=CHAMFER1_SIZE - 0.0001)  # a hair under: the kernel refuses the full size

    # Chamfer2
    chamfer2_edges = [part.edges().sort_by_distance(p)[0] for p in [
        (-21.9, 3, 46.15),
        (21.9, 3, 46.15),
    ]]
    chamfer(chamfer2_edges, length=CHAMFER2_SIZE - 0.0001)  # a hair under: the kernel refuses the full size

    # Fillet4
    fillet4_edges = [part.edges().sort_by_distance(p)[0] for p in [
        (24.5, 2.75, 46.403337045),
        (20.403337045, 2.75, 50.5),
        (-20.403337045, 2.75, 50.5),
        (-24.5, 2.75, 46.403337045),
    ]]
    fillet(fillet4_edges, radius=FILLET4_R)

    # Fillet6
    fillet6_edges = [part.edges().sort_by_distance(p)[0] for p in [
        (24.5, 2.75, -50.5),
        (-24.5, 2.75, -50.5),
    ]]
    fillet(fillet6_edges, radius=FILLET6_R)

    # Fillet5
    fillet5_edges = [part.edges().sort_by_distance(p)[0] for p in [
        (19, 1.5, 32.4),
        (24.5, 1.5, -12.359190145),
        (-19, 1.5, 32.4),
        (-23.355759821, 1.5, 38.373434867),
        (-23.379535677, 1.5, 26.380950764),
        (23.379535677, 1.5, 26.380950764),
        (19.778589199, 1.5, 45.778770118),
        (-19.778589199, 1.5, 45.778770118),
        (0, 1.5, 50.5),
        (23.355759821, 1.5, 38.373434867),
        (-23.833971189, 1.5, 44.42584152),
        (-18.432793496, 1.5, 49.826649916),
        (18.432793496, 1.5, 49.826649916),
        (23.833971189, 1.5, 44.42584152),
        (0, 1.5, -50.5),
        (-24.5, 1.5, -12.359190145),
        (-23.328427125, 1.5, -49.328427125),
        (23.328427125, 1.5, -49.328427125),
    ]]
    fillet(fillet5_edges, radius=FILLET5_R)


with BuildPart() as body_2:
    # Sketch9 → Boss-Extrude5 (new body)
    with BuildSketch(Plane(origin=(0, 0, 0), x_dir=(1, 0, 0), z_dir=(0, 1, 0))):
        Rectangle(SKETCH9_W, SKETCH9_H)
    extrude(amount=BOSS_EXTRUDE5_DEPTH)

    # Combine1: cut part
    add(part.part, mode=Mode.SUBTRACT)


with BuildPart() as body_2_1:
    # Scale1: scaled about (0, 5.315427328, -0.095147198)
    add(body_2.part.scale(SCALE1_SCALE).moved(Location((0, 0.053154273, -0.000951472))))

    # Chamfer3
    chamfer3_edges = [body_2_1.edges().sort_by_distance(p)[0] for p in [
        (0, 0.053154273, 52.469048528),
        (26.73, 0.053154273, -0.000951472),
        (0, 0.053154273, -52.470951472),
        (-26.73, 0.053154273, -0.000951472),
        (-25.86010714, 0.053154273, 51.599155668),
        (-25.86010714, 0.053154273, -51.601058612),
        (25.86010714, 0.053154273, -51.601058612),
        (25.86010714, 0.053154273, 51.599155668),
    ]]
    chamfer(chamfer3_edges, length=CHAMFER3_SIZE)


solid = body_2_1.part
